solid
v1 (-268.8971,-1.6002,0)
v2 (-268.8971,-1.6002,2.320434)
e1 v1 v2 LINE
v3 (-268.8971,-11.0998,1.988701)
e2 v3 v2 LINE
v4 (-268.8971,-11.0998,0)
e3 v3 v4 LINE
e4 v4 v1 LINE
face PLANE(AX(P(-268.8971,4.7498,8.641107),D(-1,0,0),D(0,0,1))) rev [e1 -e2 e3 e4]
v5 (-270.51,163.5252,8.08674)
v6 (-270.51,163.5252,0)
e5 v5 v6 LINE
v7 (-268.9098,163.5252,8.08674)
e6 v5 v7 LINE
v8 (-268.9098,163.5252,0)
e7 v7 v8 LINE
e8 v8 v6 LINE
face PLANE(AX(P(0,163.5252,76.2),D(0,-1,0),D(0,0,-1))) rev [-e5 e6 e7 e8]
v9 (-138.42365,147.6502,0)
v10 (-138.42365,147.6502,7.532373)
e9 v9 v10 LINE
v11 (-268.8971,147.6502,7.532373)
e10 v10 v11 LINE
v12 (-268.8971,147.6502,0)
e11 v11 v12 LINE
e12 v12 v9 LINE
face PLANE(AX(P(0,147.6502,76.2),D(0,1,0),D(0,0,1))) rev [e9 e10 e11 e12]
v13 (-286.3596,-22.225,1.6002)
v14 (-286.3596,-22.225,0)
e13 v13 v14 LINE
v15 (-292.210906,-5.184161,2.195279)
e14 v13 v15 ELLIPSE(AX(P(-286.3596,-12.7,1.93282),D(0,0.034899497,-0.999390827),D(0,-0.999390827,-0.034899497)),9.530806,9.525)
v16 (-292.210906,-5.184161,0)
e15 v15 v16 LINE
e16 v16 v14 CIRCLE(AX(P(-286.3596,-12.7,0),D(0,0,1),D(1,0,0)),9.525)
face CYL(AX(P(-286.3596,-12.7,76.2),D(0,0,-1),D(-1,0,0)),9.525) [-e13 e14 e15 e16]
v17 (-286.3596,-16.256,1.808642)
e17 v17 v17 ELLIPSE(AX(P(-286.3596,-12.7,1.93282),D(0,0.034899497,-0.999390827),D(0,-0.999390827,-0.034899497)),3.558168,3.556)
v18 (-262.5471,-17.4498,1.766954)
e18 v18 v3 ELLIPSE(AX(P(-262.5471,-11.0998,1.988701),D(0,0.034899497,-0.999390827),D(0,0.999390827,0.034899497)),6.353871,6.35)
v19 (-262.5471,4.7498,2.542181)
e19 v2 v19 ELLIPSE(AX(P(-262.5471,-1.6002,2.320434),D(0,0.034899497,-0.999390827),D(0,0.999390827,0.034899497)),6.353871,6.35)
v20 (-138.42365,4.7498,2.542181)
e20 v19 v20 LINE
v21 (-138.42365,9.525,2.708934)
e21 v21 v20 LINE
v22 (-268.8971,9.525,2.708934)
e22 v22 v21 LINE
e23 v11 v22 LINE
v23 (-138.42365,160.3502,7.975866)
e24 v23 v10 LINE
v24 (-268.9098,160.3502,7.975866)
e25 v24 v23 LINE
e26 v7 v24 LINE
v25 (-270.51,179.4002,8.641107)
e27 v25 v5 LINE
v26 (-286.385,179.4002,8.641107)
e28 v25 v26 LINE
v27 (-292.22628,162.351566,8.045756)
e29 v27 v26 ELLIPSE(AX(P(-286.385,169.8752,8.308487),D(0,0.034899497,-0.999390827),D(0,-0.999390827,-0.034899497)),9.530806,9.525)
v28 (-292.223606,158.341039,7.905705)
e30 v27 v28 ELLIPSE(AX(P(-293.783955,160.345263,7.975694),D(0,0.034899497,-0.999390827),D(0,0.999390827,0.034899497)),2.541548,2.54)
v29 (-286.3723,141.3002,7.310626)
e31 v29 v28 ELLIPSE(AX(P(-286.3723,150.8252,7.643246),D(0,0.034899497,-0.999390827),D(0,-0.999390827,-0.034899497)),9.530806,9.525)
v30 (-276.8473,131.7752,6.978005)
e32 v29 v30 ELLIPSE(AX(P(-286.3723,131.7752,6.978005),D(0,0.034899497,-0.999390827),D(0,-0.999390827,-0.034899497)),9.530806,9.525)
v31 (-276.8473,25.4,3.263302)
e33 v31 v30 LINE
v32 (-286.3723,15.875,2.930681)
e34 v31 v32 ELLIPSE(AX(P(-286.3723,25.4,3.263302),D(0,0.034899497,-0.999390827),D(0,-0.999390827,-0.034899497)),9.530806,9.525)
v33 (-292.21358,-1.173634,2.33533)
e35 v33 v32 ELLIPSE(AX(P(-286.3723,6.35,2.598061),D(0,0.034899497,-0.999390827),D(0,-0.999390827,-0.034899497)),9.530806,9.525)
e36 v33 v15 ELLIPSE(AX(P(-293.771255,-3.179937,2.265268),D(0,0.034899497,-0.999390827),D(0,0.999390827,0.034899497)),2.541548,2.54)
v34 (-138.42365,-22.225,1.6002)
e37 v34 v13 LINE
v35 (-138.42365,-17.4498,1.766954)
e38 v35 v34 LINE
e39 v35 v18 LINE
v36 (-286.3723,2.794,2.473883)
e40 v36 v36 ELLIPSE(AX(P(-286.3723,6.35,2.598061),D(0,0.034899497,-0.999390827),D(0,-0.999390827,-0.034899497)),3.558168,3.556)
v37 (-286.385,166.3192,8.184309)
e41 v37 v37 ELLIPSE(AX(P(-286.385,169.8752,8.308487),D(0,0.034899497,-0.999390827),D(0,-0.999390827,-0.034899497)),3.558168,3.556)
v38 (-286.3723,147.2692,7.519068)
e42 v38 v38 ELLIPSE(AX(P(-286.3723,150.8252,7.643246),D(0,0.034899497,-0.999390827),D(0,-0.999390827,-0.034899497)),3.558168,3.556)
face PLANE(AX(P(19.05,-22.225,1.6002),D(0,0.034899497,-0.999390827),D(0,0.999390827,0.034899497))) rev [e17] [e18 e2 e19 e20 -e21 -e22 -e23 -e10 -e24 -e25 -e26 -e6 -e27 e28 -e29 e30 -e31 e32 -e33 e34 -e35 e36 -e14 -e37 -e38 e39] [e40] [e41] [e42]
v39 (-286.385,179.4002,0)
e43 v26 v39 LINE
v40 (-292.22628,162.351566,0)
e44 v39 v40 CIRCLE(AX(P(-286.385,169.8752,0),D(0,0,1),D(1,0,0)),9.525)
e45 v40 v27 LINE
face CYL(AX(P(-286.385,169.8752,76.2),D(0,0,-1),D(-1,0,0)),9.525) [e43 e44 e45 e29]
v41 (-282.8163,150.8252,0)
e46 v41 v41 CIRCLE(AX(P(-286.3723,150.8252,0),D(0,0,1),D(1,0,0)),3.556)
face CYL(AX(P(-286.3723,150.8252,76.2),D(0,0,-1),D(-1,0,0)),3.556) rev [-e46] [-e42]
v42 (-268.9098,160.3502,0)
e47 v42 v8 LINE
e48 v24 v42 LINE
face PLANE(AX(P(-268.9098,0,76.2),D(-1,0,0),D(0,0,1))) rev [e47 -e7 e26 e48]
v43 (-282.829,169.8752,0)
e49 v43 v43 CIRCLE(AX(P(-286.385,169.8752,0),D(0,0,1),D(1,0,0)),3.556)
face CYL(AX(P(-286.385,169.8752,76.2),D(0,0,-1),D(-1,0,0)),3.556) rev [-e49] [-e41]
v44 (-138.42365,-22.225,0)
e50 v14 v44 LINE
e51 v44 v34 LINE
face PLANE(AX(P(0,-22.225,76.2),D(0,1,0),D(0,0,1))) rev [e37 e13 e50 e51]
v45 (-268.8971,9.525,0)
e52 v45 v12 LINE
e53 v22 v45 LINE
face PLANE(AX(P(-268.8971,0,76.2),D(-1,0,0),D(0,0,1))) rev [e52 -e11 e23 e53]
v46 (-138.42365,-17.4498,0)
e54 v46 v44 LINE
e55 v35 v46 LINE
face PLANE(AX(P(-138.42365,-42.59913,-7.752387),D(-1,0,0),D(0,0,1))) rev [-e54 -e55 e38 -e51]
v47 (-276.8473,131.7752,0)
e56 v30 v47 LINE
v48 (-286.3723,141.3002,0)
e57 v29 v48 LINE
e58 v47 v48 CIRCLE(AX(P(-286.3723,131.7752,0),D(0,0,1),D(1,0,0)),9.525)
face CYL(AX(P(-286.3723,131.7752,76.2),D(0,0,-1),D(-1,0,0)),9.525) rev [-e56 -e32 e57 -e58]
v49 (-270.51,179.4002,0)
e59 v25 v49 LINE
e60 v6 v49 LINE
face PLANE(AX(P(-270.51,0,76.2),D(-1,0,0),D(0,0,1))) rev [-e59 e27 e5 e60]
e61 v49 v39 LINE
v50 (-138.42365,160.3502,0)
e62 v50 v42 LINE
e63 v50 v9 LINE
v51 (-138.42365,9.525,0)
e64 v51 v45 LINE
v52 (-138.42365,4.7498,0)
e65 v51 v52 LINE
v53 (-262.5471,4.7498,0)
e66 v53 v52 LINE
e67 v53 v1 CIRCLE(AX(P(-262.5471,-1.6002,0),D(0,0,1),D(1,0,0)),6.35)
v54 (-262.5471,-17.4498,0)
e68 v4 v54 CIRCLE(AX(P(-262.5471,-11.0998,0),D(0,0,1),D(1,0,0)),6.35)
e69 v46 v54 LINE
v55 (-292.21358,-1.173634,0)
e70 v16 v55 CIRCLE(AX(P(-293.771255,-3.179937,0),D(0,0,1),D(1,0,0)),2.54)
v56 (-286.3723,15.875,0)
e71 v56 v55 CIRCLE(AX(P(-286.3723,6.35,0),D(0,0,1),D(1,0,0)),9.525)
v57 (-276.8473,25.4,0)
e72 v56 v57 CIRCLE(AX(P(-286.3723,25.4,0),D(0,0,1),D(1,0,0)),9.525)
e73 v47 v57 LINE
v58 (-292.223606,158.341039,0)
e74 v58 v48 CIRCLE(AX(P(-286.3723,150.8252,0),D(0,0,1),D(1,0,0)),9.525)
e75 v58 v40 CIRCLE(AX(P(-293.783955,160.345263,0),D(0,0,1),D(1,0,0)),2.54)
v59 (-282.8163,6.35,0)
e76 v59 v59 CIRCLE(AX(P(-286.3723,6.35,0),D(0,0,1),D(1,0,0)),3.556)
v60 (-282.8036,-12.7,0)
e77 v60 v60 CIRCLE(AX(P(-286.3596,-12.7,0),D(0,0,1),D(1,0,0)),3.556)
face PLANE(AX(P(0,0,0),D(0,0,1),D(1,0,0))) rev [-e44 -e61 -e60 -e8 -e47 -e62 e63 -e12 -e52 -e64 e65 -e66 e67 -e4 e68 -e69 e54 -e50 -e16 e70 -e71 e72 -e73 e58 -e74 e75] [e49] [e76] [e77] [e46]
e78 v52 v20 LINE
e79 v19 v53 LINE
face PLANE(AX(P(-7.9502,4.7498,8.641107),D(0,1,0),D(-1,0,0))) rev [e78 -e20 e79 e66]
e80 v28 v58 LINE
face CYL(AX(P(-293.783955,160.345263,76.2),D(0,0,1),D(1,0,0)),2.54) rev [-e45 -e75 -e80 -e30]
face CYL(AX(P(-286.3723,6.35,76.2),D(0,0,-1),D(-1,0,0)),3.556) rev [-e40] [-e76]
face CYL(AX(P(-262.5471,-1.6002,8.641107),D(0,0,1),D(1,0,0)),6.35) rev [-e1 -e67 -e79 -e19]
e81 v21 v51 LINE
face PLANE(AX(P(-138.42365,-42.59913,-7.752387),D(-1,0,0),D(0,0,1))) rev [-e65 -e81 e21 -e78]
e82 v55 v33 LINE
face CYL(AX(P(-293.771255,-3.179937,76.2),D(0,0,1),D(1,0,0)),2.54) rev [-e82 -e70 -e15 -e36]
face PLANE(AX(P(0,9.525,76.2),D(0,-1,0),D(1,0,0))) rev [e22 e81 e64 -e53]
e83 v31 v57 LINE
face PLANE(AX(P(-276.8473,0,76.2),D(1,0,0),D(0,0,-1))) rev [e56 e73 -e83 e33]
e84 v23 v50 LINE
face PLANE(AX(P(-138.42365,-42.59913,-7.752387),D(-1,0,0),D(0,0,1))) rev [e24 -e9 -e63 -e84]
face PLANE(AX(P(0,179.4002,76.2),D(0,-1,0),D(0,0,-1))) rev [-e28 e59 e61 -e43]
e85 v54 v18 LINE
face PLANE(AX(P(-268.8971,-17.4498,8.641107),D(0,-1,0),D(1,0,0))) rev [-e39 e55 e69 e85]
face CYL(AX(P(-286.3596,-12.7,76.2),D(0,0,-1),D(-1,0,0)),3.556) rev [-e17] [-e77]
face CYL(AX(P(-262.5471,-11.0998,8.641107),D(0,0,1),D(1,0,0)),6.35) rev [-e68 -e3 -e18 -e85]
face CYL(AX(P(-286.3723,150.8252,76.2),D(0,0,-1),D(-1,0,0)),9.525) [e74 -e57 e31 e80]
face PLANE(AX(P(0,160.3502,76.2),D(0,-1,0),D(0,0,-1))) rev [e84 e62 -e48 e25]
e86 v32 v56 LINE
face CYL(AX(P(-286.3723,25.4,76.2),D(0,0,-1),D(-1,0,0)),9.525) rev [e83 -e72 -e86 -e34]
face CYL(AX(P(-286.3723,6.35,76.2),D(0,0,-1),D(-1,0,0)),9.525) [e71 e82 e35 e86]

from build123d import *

# Parameters (mm, degrees)
BOSS_EXTRUDE1_OUTLINE_R = 3.556
BOSS_EXTRUDE1_OUTLINE_W = 260.9469
BOSS_EXTRUDE1_OUTLINE_H = 138.1252
BOSS_EXTRUDE1_DEPTH     = 76.2
CUT_EXTRUDE1_DEPTH      = 355.32482824
CUT_EXTRUDE1_DEPTH_BACK = 355.32482824
FILLET1_R               = 2.54
SKETCH7_W               = 260.9469
SKETCH7_H               = 22.1996
CUT_EXTRUDE2_DEPTH      = 347.152897849
FILLET2_R               = 6.35
SKETCH8_W               = 217.439036591
SKETCH8_H               = 235.521960295
CUT_EXTRUDE4_DEPTH      = 347.144751077


# Read off the part's stored shape, not the designer's step: Boss-Extrude1
with BuildPart() as part:
    # Boss-Extrude1 outline → Boss-Extrude1 (new body)
    with BuildSketch(Plane.XY):
        with BuildLine():
            Line((-286.3596, -22.225), (9.525, -22.225))
            ThreePointArc((9.525, -22.225), (19.05, -12.7), (9.525, -3.175))
            ThreePointArc((9.525, -3.175), (19.05, 6.35), (9.525, 15.875))
            ThreePointArc((9.525, 15.875), (2.789807909, 18.664807909), (0, 25.4))
            Line((0, 25.4), (0, 131.7752))
            ThreePointArc((0, 131.7752), (2.789807909, 138.510392091), (9.525, 141.3002))
            ThreePointArc((9.525, 141.3002), (19.05, 150.8252), (9.525, 160.3502))
            ThreePointArc((9.525, 160.3502), (19.05, 169.8752), (9.525, 179.4002))
            Line((9.525, 179.4002), (-6.35, 179.4002))
            Line((-6.35, 179.4002), (-6.35, 163.5252))
            Line((-6.35, 163.5252), (-7.9502, 163.5252))
            Line((-7.9502, 163.5252), (-7.9502, 160.3502))
            Line((-7.9502, 160.3502), (-268.9098, 160.3502))
            Line((-268.9098, 160.3502), (-268.9098, 163.5252))
            Line((-268.9098, 163.5252), (-270.51, 163.5252))
            Line((-270.51, 163.5252), (-270.51, 179.4002))
            Line((-270.51, 179.4002), (-286.385, 179.4002))
            ThreePointArc((-286.385, 179.4002), (-295.91, 169.8752), (-286.385, 160.3502))
            ThreePointArc((-286.385, 160.3502), (-295.897297883, 150.818850004), (-286.3723, 141.3002))
            ThreePointArc((-286.3723, 141.3002), (-279.637107909, 138.510392091), (-276.8473, 131.7752))
            Line((-276.8473, 131.7752), (-276.8473, 25.4))
            ThreePointArc((-276.8473, 25.4), (-279.637107909, 18.664807909), (-286.3723, 15.875))
            ThreePointArc((-286.3723, 15.875), (-295.8973, 6.35), (-286.3723, -3.175))
            ThreePointArc((-286.3723, -3.175), (-295.884597883, -12.706349996), (-286.3596, -22.225))
        make_face()
        with Locations((-286.3596, -12.7)):
            Circle(BOSS_EXTRUDE1_OUTLINE_R, mode=Mode.SUBTRACT)
        with Locations((-286.3723, 6.35)):
            Circle(BOSS_EXTRUDE1_OUTLINE_R, mode=Mode.SUBTRACT)
        with Locations((9.525, -12.7)):
            Circle(BOSS_EXTRUDE1_OUTLINE_R, mode=Mode.SUBTRACT)
        with Locations((9.525, 6.35)):
            Circle(BOSS_EXTRUDE1_OUTLINE_R, mode=Mode.SUBTRACT)
        with Locations((-286.3723, 150.8252)):
            Circle(BOSS_EXTRUDE1_OUTLINE_R, mode=Mode.SUBTRACT)
        with Locations((-286.385, 169.8752)):
            Circle(BOSS_EXTRUDE1_OUTLINE_R, mode=Mode.SUBTRACT)
        with Locations((-138.42365, 78.5876)):
            Rectangle(BOSS_EXTRUDE1_OUTLINE_W, BOSS_EXTRUDE1_OUTLINE_H, mode=Mode.SUBTRACT)
        with Locations((9.525, 150.8252)):
            Circle(BOSS_EXTRUDE1_OUTLINE_R, mode=Mode.SUBTRACT)
        with Locations((9.525, 169.8752)):
            Circle(BOSS_EXTRUDE1_OUTLINE_R, mode=Mode.SUBTRACT)
    extrude(amount=BOSS_EXTRUDE1_DEPTH)

    # Sketch5 → Cut-Extrude1 (cut, two sides: drawn at the far end of the back side and taken through both)
    with BuildSketch(Plane.ZY.offset(276.8473).offset(-CUT_EXTRUDE1_DEPTH_BACK)):
        Polygon((1.6002, -22.225), (8.641107133, 179.4002), (76.2, 179.4002), (76.2, -22.225), align=None)
    extrude(amount=CUT_EXTRUDE1_DEPTH + CUT_EXTRUDE1_DEPTH_BACK, mode=Mode.SUBTRACT)

    # Fillet1
    fillet1_edges = [part.edges().sort_by_distance(p)[0] for p in [
        (-286.385, 160.3502, 3.987933237),
        (-286.3723, -3.175, 1.132720329),
        (9.525, -3.175, 1.132720329),
        (9.525, 160.3502, 3.987933237),
    ]]
    fillet(fillet1_edges, radius=FILLET1_R)

    # Sketch7 → Cut-Extrude2 (cut, through all)
    with BuildSketch(Plane(origin=(0, 0, 0), x_dir=(-1, 0, 0), z_dir=(0, 0, -1))):
        with Locations((138.42365, -6.35)):
            Rectangle(SKETCH7_W, SKETCH7_H)
    extrude(amount=-CUT_EXTRUDE2_DEPTH, mode=Mode.SUBTRACT)

    # Fillet2
    fillet2_edges = [part.edges().sort_by_distance(p)[0] for p in [
        (-268.8971, 4.7498, 1.271090386),
        (-268.8971, -17.4498, 0.883476829),
        (-7.9502, -17.4498, 0.883476829),
        (-7.9502, 4.7498, 1.271090386),
    ]]
    fillet(fillet2_edges, radius=FILLET2_R)

    # Sketch8 → Cut-Extrude4 (cut, through all)
    with BuildSketch(Plane(origin=(0, -0.082881646, 2.373419811), x_dir=(1, 0, 0), z_dir=(0, -0.03489949670250444, 0.9993908270190958))):
        with Locations((-29.704131704, 74.917246318)):
            Rectangle(SKETCH8_W, SKETCH8_H)
    extrude(amount=-CUT_EXTRUDE4_DEPTH, mode=Mode.SUBTRACT)


solid = part.part
